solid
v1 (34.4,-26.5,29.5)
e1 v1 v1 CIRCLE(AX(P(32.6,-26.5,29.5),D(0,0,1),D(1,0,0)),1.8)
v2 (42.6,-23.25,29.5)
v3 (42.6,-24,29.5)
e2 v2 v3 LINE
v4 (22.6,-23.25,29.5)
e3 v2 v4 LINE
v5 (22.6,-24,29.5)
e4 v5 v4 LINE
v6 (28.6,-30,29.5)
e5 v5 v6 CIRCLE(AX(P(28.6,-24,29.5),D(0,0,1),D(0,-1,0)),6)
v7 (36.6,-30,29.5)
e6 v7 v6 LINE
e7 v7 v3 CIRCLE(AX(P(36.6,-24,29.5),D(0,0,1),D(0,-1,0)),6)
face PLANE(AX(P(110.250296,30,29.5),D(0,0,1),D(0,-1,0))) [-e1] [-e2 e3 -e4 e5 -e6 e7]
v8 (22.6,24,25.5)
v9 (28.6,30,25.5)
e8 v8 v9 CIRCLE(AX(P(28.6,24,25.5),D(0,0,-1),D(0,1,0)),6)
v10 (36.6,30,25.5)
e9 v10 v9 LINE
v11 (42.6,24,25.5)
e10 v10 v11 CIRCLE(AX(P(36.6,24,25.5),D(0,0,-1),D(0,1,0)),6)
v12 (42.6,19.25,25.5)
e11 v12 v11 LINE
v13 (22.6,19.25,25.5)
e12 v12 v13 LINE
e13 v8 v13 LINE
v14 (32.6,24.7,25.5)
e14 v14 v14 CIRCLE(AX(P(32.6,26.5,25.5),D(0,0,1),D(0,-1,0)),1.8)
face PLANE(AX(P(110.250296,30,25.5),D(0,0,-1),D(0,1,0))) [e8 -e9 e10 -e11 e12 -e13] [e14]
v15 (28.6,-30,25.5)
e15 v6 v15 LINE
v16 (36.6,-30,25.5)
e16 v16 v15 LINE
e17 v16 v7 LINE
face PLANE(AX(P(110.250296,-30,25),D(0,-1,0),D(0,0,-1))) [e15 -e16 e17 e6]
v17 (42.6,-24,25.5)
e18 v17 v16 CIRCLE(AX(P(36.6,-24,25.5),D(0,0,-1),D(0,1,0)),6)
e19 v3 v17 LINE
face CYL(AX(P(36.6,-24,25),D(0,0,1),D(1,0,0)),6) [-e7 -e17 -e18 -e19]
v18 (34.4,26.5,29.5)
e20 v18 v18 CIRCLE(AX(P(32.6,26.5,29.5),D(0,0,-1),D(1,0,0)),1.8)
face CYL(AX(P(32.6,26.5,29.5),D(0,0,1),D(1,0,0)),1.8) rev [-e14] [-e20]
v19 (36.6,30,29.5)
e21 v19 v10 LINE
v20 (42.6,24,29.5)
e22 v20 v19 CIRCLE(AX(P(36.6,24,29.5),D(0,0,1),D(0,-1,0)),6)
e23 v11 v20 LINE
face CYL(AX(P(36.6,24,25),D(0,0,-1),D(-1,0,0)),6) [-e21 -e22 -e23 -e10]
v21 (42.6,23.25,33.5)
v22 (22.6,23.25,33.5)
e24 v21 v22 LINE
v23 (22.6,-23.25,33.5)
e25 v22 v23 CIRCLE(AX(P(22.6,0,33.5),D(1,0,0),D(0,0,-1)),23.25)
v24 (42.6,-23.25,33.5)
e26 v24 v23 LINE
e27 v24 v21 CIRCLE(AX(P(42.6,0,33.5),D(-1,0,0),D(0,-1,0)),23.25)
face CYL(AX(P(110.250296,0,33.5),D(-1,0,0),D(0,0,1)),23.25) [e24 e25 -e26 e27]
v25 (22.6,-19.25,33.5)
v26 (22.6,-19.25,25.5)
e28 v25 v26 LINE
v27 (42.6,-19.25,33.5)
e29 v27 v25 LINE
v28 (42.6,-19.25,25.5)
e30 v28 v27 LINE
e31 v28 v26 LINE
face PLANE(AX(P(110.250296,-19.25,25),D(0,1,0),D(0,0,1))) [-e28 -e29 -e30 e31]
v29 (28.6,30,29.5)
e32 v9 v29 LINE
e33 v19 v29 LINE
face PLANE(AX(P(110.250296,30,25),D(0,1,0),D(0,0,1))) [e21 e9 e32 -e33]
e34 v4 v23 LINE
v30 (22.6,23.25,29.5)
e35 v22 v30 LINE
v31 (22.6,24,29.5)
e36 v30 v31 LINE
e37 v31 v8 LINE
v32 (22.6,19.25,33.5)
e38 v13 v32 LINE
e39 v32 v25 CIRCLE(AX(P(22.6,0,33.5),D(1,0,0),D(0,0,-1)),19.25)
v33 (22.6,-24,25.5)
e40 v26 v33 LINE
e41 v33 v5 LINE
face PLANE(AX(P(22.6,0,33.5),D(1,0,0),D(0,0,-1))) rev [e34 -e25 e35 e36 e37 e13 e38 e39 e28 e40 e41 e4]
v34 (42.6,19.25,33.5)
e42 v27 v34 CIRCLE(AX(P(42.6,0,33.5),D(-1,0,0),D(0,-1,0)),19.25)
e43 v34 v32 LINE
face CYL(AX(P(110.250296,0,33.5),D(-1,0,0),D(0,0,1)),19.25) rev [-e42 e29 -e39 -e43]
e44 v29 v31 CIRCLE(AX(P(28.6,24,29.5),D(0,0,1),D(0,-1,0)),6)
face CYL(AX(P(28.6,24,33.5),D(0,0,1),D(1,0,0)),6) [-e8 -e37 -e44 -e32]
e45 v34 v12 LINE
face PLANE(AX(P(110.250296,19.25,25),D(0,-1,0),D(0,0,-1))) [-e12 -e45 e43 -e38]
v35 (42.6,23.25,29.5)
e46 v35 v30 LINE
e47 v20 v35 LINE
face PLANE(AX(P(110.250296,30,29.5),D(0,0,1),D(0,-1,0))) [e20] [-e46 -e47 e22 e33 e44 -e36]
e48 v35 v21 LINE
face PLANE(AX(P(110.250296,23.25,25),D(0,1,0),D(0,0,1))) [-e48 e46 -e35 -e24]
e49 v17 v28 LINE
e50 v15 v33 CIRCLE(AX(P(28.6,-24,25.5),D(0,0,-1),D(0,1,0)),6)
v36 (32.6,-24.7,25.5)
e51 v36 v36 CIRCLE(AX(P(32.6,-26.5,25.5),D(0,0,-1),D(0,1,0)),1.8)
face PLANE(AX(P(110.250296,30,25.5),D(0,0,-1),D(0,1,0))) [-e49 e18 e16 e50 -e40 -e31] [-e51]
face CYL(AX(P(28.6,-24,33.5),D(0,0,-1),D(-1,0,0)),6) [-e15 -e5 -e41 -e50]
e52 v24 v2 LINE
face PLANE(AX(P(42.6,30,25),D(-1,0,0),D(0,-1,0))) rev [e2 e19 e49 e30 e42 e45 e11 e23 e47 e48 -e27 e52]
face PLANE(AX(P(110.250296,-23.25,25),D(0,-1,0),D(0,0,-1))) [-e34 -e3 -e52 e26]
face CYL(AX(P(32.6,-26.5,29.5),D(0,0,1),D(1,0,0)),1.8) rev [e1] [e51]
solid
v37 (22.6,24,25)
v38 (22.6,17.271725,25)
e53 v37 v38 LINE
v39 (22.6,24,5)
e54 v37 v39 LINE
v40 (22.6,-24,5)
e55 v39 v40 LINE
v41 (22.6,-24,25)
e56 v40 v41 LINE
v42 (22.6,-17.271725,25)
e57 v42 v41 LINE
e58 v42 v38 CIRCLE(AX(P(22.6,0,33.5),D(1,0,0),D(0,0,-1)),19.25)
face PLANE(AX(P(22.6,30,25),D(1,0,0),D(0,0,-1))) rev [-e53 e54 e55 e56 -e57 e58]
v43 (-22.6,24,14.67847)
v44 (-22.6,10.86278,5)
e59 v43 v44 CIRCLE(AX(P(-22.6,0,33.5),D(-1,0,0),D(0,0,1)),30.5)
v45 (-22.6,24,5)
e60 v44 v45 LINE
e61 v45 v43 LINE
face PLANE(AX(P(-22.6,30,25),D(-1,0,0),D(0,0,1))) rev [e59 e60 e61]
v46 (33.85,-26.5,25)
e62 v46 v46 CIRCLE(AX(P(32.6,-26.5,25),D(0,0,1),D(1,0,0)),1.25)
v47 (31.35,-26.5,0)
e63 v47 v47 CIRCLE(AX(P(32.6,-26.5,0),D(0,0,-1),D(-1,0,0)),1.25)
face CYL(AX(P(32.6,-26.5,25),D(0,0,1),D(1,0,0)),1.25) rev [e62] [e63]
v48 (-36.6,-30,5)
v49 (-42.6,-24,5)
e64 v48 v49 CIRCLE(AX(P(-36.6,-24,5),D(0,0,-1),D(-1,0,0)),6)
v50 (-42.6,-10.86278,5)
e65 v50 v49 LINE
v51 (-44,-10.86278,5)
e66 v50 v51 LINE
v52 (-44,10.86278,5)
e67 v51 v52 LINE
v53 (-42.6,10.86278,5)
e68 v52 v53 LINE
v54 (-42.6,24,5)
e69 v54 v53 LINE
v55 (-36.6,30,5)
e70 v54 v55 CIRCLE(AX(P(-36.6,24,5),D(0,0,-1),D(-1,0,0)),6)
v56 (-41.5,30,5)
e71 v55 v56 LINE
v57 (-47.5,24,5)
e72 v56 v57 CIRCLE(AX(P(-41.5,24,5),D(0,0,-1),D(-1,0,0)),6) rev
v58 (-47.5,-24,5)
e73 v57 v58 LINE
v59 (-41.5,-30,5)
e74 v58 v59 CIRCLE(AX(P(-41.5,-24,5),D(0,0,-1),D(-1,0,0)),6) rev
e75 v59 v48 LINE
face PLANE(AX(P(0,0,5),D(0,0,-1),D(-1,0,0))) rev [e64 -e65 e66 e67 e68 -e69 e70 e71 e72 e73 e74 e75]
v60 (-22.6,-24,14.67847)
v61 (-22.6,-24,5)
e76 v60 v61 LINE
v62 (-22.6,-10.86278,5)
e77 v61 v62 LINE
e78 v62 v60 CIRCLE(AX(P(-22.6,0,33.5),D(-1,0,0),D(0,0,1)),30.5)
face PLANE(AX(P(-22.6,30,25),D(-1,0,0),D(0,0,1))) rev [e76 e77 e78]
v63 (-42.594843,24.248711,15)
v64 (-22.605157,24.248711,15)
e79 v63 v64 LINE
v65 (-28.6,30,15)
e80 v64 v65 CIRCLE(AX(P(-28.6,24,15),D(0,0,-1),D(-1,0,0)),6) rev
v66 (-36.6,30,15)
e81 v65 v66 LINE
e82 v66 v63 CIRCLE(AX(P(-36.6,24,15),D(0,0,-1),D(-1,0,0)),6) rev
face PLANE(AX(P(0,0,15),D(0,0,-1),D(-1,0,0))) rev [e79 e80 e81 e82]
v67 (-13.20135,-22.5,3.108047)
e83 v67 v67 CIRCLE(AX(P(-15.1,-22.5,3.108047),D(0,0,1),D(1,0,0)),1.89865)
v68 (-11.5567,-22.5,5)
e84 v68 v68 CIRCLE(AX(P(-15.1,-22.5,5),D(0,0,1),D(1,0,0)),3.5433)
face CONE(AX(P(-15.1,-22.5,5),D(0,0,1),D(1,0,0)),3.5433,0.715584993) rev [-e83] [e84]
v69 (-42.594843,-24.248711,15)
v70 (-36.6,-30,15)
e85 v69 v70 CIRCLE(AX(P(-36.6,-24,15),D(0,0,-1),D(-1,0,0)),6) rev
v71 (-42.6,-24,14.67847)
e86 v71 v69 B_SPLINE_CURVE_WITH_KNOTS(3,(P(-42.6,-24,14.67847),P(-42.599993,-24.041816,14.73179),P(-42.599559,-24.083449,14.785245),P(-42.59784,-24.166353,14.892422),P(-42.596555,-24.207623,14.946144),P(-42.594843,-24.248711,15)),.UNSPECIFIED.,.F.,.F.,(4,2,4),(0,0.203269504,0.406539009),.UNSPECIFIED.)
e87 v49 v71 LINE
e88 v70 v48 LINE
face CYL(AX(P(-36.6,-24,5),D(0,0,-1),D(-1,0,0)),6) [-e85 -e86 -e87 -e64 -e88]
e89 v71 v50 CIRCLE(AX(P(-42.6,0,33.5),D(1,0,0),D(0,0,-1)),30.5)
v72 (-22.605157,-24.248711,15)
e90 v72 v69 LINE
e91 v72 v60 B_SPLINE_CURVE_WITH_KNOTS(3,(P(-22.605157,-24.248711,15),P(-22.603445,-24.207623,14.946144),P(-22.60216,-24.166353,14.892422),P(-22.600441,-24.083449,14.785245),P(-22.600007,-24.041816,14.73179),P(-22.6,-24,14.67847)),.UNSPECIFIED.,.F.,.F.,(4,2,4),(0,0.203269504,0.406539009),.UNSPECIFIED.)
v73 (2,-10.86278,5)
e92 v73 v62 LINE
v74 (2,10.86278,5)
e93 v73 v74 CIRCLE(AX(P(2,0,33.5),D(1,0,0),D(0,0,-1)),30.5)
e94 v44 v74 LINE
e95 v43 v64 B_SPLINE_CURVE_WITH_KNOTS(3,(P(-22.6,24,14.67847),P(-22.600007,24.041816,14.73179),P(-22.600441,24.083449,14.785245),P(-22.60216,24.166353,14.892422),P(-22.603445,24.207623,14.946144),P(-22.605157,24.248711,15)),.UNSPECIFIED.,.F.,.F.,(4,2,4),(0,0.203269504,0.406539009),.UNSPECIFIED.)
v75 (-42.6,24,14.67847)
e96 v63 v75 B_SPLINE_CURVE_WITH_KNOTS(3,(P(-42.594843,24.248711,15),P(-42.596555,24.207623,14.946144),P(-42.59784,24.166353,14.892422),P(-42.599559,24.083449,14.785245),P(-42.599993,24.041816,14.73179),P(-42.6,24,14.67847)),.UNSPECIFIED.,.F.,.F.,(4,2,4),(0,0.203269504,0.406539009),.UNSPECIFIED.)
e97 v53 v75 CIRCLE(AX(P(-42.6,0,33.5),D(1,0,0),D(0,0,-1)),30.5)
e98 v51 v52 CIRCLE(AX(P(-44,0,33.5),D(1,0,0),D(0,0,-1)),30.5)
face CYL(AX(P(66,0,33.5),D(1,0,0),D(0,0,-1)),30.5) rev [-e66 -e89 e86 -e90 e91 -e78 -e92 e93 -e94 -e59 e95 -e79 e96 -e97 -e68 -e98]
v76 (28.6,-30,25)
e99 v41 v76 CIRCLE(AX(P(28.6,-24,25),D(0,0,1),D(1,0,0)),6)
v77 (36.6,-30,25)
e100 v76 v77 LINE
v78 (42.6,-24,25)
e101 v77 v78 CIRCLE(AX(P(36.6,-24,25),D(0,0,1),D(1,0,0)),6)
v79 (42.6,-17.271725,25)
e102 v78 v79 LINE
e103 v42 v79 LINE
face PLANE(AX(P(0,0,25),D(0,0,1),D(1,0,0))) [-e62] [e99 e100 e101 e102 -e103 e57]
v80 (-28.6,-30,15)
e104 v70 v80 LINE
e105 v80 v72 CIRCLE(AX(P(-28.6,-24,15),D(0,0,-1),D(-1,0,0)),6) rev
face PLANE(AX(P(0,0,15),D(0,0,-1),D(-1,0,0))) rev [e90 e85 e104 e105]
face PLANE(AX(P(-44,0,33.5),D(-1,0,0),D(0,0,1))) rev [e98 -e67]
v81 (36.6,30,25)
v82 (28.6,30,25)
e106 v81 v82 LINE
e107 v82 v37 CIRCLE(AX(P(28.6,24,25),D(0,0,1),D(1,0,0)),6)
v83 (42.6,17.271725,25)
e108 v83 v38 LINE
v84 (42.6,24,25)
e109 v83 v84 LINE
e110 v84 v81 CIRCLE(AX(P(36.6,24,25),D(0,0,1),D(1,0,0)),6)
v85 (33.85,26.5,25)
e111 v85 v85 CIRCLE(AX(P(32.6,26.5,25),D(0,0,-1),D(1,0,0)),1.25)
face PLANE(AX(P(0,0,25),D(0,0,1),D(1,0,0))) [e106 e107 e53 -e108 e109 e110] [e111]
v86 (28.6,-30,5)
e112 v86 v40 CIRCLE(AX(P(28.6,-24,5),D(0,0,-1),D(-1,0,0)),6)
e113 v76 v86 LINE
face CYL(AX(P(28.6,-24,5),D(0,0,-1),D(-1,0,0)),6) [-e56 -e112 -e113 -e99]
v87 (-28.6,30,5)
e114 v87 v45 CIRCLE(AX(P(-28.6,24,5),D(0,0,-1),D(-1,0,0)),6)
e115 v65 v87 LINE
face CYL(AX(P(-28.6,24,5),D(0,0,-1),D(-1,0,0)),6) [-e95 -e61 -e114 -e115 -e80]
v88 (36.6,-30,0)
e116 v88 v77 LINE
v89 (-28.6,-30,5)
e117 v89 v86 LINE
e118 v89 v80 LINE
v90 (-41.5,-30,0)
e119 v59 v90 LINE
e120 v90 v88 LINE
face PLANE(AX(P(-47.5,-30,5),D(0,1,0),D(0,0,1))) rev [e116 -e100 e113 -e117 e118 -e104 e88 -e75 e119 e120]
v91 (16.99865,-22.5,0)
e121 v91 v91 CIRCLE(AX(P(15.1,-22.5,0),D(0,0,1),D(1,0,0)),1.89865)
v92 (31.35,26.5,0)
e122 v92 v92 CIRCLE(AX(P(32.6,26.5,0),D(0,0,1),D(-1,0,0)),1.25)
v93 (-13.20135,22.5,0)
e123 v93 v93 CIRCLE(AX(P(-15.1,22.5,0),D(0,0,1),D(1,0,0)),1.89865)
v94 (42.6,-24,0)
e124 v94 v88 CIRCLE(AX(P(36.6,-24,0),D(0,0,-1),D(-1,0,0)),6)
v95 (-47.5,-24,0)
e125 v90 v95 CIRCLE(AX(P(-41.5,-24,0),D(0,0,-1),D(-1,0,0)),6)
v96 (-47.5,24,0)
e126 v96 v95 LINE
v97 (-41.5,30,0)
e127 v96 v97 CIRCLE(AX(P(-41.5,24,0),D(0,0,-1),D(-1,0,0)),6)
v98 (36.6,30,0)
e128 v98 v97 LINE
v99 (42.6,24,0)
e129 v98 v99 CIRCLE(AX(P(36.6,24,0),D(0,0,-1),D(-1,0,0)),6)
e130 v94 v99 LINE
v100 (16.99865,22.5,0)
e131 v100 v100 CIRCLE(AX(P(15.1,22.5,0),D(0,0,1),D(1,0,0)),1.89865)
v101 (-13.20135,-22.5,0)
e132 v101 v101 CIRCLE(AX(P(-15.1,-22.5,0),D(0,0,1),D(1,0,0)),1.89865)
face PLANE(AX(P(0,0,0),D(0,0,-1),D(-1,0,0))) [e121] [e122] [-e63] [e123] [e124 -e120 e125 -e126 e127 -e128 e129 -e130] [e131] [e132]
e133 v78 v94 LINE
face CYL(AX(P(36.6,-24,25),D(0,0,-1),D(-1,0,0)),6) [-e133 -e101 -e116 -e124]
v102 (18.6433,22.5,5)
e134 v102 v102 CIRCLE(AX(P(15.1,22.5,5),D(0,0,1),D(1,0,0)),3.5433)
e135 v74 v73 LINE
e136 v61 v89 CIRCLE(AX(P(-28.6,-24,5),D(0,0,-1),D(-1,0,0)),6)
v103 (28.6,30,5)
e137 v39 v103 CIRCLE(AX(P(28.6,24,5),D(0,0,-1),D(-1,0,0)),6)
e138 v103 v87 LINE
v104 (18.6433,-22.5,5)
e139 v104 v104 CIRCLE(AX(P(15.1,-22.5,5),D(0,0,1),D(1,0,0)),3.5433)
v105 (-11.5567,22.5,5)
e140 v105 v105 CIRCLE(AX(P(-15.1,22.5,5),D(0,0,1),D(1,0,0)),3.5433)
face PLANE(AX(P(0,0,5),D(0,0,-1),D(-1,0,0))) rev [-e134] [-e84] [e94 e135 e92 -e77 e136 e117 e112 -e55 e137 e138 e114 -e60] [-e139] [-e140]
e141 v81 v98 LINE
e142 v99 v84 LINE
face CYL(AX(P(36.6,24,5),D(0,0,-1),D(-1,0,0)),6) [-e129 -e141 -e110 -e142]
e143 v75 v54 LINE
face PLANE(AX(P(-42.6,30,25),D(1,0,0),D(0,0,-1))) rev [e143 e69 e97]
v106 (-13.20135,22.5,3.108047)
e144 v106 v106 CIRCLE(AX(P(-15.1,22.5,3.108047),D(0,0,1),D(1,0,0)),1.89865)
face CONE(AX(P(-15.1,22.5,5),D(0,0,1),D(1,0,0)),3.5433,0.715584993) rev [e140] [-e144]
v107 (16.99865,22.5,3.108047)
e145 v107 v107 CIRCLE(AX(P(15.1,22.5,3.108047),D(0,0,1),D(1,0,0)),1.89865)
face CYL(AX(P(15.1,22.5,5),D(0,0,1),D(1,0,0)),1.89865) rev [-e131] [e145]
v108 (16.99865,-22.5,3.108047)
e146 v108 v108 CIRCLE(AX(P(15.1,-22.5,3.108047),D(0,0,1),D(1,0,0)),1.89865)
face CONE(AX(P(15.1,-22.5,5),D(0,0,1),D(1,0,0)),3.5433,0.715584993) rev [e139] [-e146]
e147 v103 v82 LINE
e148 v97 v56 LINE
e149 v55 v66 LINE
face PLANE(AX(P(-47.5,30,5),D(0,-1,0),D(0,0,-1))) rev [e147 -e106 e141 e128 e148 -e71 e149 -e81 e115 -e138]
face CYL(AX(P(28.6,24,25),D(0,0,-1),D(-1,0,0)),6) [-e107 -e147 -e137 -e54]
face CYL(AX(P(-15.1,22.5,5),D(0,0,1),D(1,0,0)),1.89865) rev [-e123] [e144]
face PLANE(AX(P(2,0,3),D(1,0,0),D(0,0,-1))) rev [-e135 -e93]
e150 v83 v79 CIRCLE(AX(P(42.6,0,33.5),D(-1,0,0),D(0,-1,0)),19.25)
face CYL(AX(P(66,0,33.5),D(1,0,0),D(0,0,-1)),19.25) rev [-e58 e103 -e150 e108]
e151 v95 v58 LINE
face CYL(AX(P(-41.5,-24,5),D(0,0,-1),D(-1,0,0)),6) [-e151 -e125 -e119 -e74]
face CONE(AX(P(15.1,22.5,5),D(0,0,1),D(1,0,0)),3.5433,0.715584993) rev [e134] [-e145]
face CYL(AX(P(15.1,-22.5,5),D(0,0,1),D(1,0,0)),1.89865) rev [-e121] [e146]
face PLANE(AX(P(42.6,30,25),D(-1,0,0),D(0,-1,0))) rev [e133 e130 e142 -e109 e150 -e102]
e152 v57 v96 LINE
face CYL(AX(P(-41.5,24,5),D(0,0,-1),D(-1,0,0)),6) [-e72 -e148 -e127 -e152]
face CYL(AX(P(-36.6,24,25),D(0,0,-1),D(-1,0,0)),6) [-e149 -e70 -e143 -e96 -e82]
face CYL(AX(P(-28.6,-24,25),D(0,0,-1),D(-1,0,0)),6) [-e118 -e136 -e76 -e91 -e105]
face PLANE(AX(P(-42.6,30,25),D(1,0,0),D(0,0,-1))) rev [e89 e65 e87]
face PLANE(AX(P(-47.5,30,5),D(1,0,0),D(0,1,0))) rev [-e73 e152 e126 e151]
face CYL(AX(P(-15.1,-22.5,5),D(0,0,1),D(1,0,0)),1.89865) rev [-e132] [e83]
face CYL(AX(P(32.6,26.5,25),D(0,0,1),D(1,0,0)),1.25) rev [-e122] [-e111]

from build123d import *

# Parameters (mm, degrees)
BASE_SKETCH_W                   = 90
BASE_SKETCH_H                   = 60
BASE_EXTRUDE_DEPTH              = 5
CRADLE_SKETCH_W                 = 20
CRADLE_SKETCH_H                 = 60
CRADLE_EXTRUDE_DEPTH            = 25
NO_6_MOUNTING_HOLES_D           = 3.7973
NO_6_MOUNTING_HOLES_CSINK_D     = 7.0866
NO_6_MOUNTING_HOLES_CSINK_ANGLE = 82
MOVE_START                      = 15
MOVE_FACE_OUTLINE_W             = 20
MOVE_FACE_OUTLINE_H             = 60
MOVE_FACE_DEPTH                 = 10
CLAMP_THREADED_HOLE_D           = 2.5
CRADLE_FILLETS_R                = 6
BASE_FILLETS_R                  = 6
MOTOR_START                     = 22.6
MOTOR_CLAMP_EXTRUDE_DEPTH       = 20
SKETCH9_W                       = 1.8
SKETCH9_H                       = 4
CLAMP_CORNER_FILLETS_R          = 6


# Read off the part's stored shape, not the designer's step: Move Face
with BuildPart() as part:
    # Base Sketch → Base Extrude (new body)
    with BuildSketch(Plane.XY):
        with Locations((-2.5, 0)):
            Rectangle(BASE_SKETCH_W, BASE_SKETCH_H)
    extrude(amount=BASE_EXTRUDE_DEPTH)

    # Cradle Sketch → Cradle Extrude (add)
    with BuildSketch(Plane.XY):
        with Locations((-32.6, 0)):
            Rectangle(CRADLE_SKETCH_W, CRADLE_SKETCH_H)
        with Locations((32.6, 0)):
            Rectangle(CRADLE_SKETCH_W, CRADLE_SKETCH_H)
    extrude(amount=CRADLE_EXTRUDE_DEPTH)

    # No. 6 Mounting Holes (through all)
    with Locations(Plane.XY.offset(5)):
        with Locations((-15.1, 22.5), (15.1, 22.5), (-15.1, -22.5), (15.1, -22.5)):
            CounterSinkHole(NO_6_MOUNTING_HOLES_D / 2, NO_6_MOUNTING_HOLES_CSINK_D / 2, counter_sink_angle=NO_6_MOUNTING_HOLES_CSINK_ANGLE)

    # Pump and Motor Revolve Cut Sketch → Pump and Motor Revolve Cut (revolve, cut)
    with BuildSketch(Plane(origin=(0, 0, 0), x_dir=(1, 0, 0), z_dir=(0, 1, 0))):
        Polygon((-44, -33.5), (-44, -3), (2, -3), (2, -14.25), (66, -14.25), (66, -33.5), align=None)
    revolve(axis=Axis((66, 0, 33.5), (-1, 0, 0)), mode=Mode.SUBTRACT)

    # Move Face outline → Move Face (cut)
    with BuildSketch(Plane.XY.offset(MOVE_START)):
        with Locations((-32.6, 0)):
            Rectangle(MOVE_FACE_OUTLINE_W, MOVE_FACE_OUTLINE_H)
    extrude(amount=MOVE_FACE_DEPTH, mode=Mode.SUBTRACT)

    # Clamp Threaded Hole (through all)
    with Locations(Plane.XY.offset(25)):
        with Locations((32.6, -26.5)):
            clamp_threaded_hole = Hole(CLAMP_THREADED_HOLE_D / 2)

    # Cradle Fillets
    cradle_fillets_edges = [part.edges().sort_by_distance(p)[0] for p in [
        (-42.6, 30, 10),
        (42.6, 30, 12.5),
        (42.6, -30, 12.5),
        (-42.6, -30, 10),
        (22.6, 30, 15),
        (22.6, -30, 15),
        (-22.6, 30, 10),
        (-22.6, -30, 10),
    ]]
    fillet(cradle_fillets_edges, radius=CRADLE_FILLETS_R)

    # Base Fillets
    base_fillets_edges = [part.edges().sort_by_distance(p)[0] for p in [
        (-47.5, -30, 2.5),
        (-47.5, 30, 2.5),
    ]]
    fillet(base_fillets_edges, radius=BASE_FILLETS_R)


with BuildPart() as body_2:
    # Hold Down Bracket Sketch → Motor Clamp Extrude (new body)
    with BuildSketch(Plane(origin=(0, 0, 0), x_dir=(0, 0, -1), z_dir=(1, 0, 0)).offset(MOTOR_START)):
        with BuildLine():
            Line((-33.5, -23.25), (-29.5, -23.25))
            Line((-29.5, -23.25), (-29.5, -30))
            Line((-29.5, -30), (-25.5, -30))
            Line((-25.5, -30), (-25.5, -19.25))
            Line((-25.5, -19.25), (-33.5, -19.25))
            ThreePointArc((-33.5, -19.25), (-52.75, 0), (-33.5, 19.25))
            Line((-33.5, 19.25), (-25.5, 19.25))
            Line((-25.5, 19.25), (-25.5, 30))
            Line((-25.5, 30), (-29.5, 30))
            Line((-29.5, 30), (-29.5, 23.25))
            Line((-29.5, 23.25), (-33.5, 23.25))
            ThreePointArc((-33.5, 23.25), (-56.75, 0), (-33.5, -23.25))
        make_face()
    extrude(amount=MOTOR_CLAMP_EXTRUDE_DEPTH)

    # Sketch9 → Clamp Clearance Hole (revolve, cut)
    with BuildSketch(Plane(origin=(32.6, -26.5, 29.5), x_dir=(0, -1, 0), z_dir=(1, 0, 0))):
        with Locations((0.9, 2)):
            Rectangle(SKETCH9_W, SKETCH9_H)
    clamp_clearance_hole = revolve(axis=Axis((32.6, -26.5, 35.85), (0, 0, -1)), mode=Mode.SUBTRACT)


with BuildPart() as motor_clamp_screw_holes_mirror_tool:
    # Motor Clamp Screw Holes Mirror: Clamp Threaded Hole, Clamp Clearance Hole across plane
    add(clamp_threaded_hole.mirror(Plane.ZX))
    add(clamp_clearance_hole.mirror(Plane.ZX))


with BuildPart() as part_1:
    add(part.part)

    # Motor Clamp Screw Holes Mirror: cut by motor_clamp_screw_holes_mirror_tool
    add(motor_clamp_screw_holes_mirror_tool.part, mode=Mode.SUBTRACT)


with BuildPart() as body_2_1:
    add(body_2.part)

    # Motor Clamp Screw Holes Mirror: cut by motor_clamp_screw_holes_mirror_tool
    add(motor_clamp_screw_holes_mirror_tool.part, mode=Mode.SUBTRACT)

    # Clamp Corner Fillets
    clamp_corner_fillets_edges = [body_2_1.edges().sort_by_distance(p)[0] for p in [
        (22.6, -30, 27.5),
        (22.6, 30, 27.5),
        (42.6, -30, 27.5),
        (42.6, 30, 27.5),
    ]]
    fillet(clamp_corner_fillets_edges, radius=CLAMP_CORNER_FILLETS_R)


solid = Compound([part_1.part, body_2_1.part])
